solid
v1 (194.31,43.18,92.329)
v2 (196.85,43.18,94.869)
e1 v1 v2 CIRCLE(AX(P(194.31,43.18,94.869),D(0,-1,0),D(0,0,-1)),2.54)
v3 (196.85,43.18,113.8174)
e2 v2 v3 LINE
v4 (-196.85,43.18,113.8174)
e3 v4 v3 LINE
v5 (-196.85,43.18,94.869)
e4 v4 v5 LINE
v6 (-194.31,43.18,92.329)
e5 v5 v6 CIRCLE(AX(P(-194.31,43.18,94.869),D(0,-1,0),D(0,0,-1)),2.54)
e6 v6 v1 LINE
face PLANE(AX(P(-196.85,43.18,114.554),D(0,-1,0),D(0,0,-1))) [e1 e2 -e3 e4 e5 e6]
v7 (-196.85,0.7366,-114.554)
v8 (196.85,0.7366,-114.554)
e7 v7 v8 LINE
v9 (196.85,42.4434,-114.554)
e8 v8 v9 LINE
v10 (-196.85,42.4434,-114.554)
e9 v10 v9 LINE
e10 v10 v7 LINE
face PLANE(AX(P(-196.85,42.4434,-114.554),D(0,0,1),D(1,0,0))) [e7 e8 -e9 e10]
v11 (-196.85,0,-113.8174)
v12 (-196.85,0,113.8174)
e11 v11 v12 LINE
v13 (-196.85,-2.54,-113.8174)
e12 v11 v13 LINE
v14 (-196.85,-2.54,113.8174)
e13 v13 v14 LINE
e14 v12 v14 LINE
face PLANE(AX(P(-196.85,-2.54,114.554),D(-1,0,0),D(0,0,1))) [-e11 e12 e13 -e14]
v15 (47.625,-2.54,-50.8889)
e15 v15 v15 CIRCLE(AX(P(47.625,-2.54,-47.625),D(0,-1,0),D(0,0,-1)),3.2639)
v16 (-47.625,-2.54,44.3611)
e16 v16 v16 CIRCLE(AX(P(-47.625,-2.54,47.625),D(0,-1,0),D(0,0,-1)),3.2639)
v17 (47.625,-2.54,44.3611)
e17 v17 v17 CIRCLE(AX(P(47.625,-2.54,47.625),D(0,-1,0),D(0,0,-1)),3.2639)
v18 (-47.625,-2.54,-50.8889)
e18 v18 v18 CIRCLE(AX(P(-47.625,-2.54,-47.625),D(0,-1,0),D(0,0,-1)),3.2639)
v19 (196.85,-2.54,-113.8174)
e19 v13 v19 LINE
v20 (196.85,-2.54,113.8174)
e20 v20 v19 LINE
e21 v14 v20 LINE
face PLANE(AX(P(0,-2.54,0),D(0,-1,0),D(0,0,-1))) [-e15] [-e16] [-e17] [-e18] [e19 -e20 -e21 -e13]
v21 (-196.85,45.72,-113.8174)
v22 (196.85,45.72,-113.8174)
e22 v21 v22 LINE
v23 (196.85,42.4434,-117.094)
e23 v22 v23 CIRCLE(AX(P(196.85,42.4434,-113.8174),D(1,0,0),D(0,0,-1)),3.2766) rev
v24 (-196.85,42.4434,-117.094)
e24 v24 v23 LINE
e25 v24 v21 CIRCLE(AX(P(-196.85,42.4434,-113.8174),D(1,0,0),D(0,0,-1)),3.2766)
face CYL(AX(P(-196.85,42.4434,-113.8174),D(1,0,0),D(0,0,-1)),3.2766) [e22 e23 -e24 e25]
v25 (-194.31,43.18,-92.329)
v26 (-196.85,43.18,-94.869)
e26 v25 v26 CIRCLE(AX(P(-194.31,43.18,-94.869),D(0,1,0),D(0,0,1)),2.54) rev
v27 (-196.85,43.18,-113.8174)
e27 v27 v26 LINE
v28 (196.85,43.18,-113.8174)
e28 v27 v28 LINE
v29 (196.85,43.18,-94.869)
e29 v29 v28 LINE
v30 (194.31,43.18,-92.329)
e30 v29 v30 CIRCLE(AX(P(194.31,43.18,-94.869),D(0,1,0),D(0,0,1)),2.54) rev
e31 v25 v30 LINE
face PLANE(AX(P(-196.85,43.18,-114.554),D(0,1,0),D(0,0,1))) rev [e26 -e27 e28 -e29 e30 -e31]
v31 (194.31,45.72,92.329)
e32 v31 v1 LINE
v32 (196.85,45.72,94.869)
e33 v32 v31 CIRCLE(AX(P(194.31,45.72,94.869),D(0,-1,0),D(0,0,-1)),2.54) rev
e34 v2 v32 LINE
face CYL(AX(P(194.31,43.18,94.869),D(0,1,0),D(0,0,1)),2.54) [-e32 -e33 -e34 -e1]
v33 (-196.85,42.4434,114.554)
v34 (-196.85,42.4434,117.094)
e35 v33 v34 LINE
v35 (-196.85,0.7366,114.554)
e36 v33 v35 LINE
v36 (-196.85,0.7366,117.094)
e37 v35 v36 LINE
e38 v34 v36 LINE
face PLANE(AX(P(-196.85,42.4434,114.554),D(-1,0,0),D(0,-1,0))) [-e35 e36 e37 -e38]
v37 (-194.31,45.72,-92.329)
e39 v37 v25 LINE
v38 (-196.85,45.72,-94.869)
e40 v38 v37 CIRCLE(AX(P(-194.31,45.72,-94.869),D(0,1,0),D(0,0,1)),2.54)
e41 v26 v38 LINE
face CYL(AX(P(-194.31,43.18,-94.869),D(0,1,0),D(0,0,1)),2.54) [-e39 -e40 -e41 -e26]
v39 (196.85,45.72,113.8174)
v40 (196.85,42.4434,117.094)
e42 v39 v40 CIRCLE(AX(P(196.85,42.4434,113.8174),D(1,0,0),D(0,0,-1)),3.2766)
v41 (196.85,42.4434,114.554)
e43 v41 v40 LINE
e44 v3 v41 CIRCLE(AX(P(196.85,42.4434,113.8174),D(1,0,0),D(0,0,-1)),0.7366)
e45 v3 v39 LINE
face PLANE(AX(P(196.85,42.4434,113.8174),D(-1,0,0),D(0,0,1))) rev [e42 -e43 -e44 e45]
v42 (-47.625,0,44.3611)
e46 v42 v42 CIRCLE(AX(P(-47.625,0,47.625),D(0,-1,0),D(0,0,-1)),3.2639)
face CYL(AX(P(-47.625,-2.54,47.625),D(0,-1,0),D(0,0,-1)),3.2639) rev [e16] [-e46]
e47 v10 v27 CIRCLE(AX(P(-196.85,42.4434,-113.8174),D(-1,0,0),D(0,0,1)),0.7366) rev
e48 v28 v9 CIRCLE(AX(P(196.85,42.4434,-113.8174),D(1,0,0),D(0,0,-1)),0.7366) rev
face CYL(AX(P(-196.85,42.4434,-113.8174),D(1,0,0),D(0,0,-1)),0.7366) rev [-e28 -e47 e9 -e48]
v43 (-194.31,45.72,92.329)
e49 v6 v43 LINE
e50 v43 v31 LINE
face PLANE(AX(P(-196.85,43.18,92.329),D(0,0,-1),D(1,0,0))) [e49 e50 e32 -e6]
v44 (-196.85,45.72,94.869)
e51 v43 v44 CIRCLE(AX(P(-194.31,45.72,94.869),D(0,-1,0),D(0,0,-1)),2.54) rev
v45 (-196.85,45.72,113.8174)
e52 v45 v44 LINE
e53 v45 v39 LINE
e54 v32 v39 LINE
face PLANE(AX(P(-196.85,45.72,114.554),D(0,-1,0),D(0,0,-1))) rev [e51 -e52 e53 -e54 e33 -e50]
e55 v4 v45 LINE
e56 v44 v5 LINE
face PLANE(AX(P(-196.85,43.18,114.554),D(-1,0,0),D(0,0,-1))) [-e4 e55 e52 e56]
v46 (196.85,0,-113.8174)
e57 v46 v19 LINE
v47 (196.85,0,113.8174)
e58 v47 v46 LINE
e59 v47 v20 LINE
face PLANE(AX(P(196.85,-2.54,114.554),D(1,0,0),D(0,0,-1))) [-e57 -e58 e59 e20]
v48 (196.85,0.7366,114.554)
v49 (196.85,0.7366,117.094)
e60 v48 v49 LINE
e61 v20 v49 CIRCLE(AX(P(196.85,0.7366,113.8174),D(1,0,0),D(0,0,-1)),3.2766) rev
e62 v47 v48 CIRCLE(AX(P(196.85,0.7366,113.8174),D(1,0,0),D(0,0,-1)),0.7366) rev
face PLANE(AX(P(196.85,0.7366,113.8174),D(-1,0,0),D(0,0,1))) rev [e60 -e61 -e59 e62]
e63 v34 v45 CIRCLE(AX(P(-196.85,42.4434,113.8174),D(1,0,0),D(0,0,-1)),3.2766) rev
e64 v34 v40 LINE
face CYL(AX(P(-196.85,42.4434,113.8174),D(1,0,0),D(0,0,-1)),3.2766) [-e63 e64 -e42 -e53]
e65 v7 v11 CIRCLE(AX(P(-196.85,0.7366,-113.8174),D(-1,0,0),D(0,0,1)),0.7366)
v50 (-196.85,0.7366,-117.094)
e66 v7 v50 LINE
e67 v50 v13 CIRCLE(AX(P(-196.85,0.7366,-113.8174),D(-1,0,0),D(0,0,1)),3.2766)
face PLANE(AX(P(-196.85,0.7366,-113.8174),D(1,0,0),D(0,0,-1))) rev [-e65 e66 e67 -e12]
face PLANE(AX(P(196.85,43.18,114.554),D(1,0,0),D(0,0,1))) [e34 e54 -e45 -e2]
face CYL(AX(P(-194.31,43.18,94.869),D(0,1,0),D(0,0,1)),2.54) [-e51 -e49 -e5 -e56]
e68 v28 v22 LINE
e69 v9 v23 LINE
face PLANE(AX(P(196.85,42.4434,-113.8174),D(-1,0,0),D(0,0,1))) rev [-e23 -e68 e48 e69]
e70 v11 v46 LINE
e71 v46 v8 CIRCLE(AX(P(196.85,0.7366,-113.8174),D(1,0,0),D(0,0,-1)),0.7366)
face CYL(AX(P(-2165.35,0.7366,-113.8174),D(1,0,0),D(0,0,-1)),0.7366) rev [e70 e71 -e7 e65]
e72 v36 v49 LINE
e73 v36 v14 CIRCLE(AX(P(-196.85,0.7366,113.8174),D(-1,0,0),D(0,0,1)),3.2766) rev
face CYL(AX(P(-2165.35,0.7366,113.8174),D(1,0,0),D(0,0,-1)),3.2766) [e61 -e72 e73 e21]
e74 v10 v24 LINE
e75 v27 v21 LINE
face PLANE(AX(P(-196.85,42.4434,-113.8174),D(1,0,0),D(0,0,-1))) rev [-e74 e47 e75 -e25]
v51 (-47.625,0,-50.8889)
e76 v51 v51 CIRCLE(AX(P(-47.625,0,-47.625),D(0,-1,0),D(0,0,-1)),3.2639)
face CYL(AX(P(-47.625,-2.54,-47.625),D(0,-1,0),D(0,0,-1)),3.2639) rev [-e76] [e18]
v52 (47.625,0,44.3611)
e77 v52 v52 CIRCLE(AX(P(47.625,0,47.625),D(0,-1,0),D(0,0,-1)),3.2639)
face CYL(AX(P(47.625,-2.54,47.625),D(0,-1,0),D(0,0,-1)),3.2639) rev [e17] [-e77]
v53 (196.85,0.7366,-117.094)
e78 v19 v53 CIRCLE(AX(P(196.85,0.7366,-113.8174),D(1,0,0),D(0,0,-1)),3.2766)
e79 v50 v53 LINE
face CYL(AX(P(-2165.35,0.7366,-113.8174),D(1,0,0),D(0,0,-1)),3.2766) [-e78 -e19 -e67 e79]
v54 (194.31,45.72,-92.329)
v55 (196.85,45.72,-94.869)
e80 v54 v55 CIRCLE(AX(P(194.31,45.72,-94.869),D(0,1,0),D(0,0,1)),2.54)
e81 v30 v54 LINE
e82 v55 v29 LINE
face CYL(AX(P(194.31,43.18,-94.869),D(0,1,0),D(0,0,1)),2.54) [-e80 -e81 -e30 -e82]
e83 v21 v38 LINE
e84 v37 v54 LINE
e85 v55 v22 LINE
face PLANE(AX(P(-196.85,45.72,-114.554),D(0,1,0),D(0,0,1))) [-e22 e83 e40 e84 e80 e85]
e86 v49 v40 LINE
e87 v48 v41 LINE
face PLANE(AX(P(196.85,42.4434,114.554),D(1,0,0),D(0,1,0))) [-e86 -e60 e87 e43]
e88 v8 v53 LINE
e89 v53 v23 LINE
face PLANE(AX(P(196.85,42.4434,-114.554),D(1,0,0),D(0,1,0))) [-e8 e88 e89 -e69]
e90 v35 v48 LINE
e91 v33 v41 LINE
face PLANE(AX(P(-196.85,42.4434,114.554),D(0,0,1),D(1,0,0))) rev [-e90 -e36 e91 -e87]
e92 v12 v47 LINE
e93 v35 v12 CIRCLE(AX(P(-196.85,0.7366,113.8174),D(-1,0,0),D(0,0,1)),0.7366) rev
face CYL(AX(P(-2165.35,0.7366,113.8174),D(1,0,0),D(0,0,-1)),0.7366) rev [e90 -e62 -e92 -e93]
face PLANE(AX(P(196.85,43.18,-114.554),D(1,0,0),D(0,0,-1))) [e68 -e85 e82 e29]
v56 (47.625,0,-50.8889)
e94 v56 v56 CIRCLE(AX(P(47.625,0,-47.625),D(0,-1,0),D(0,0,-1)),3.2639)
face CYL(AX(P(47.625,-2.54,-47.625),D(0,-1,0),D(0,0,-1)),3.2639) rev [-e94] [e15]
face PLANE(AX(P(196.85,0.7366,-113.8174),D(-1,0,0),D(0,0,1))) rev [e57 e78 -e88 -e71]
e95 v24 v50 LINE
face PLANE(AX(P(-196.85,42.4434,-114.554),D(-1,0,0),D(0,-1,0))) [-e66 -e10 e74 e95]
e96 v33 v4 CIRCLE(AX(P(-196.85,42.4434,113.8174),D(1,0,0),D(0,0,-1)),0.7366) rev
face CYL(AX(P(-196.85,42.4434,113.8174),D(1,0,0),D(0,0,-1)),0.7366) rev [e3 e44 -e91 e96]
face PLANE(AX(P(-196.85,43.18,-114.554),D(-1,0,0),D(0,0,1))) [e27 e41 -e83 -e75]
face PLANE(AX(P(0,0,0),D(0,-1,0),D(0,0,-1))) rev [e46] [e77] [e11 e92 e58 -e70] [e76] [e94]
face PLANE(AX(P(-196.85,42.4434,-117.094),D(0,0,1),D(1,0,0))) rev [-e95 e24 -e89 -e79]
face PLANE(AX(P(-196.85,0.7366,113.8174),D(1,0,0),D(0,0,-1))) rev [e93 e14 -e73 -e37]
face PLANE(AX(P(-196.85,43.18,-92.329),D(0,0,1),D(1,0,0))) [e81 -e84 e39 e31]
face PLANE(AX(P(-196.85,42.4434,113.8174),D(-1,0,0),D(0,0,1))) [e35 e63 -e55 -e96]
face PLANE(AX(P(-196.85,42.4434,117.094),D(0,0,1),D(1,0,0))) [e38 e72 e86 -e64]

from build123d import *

# Parameters (mm, degrees)
SKETCH1_W               = 393.7
SKETCH1_H               = 229.108
BASE_FLANGE1_DEPTH      = 2.54
MITER_START             = -196.85
MITER_FLANGE1_DEPTH     = 393.7
MITER_FLANGE1_2_DEPTH   = 393.7
FILLET1_R               = 2.54
F_1_4_CLEARANCE_HOLE1_D = 6.5278


# Read off the part's stored shape, not the designer's step: Miter Flange1
# Sheet-metal steps are written as plain solids
with BuildPart() as part:
    # Sketch1 → Base-Flange1 (new body)
    with BuildSketch(Plane(origin=(0, 0, 0), x_dir=(1, 0, 0), z_dir=(0, 1, 0))):
        Rectangle(SKETCH1_W, SKETCH1_H)
    extrude(amount=-BASE_FLANGE1_DEPTH)

    # Miter Flange1 outline → Miter Flange1 (cut)
    with BuildSketch(Plane.YZ.offset(MITER_START)):
        with BuildLine():
            Line((-2.54, -114.554), (-2.456130493, -114.554))
            ThreePointArc((-2.456130493, -114.554), (-2.518965104, -114.188079664), (-2.54, -113.8174))
            Line((-2.54, -113.8174), (-2.54, -114.554))
        make_face()
    miter_flange1 = extrude(amount=MITER_FLANGE1_DEPTH, mode=Mode.SUBTRACT)

    # Miter Flange1 2 outline → Miter Flange1 2 (add)
    with BuildSketch(Plane.YZ.offset(MITER_START)):
        with BuildLine():
            Line((45.72, -113.8174), (45.72, -92.329))
            Line((45.72, -92.329), (43.18, -92.329))
            Line((43.18, -92.329), (43.18, -113.8174))
            ThreePointArc((43.18, -113.8174), (42.964254855, -114.338254855), (42.4434, -114.554))
            Line((42.4434, -114.554), (0.7366, -114.554))
            ThreePointArc((0.7366, -114.554), (0.215745145, -114.338254855), (0, -113.8174))
            Line((0, -113.8174), (0, -114.554))
            Line((0, -114.554), (-2.456130493, -114.554))
            ThreePointArc((-2.456130493, -114.554), (-1.303322057, -116.381542266), (0.7366, -117.094))
            Line((0.7366, -117.094), (42.4434, -117.094))
            ThreePointArc((42.4434, -117.094), (44.760306079, -116.134306079), (45.72, -113.8174))
        make_face()
    miter_flange1_2 = extrude(amount=MITER_FLANGE1_2_DEPTH)

    # Mirror1: Miter Flange1, Miter Flange1 2 across plane
    add(miter_flange1.mirror(Plane.XY), mode=Mode.SUBTRACT)
    add(miter_flange1_2.mirror(Plane.XY))

    # Fillet1
    fillet1_edges = [part.edges().sort_by_distance(p)[0] for p in [
        (-196.85, 44.45, -92.329),
        (196.85, 44.45, -92.329),
        (-196.85, 44.45, 92.329),
        (196.85, 44.45, 92.329),
    ]]
    fillet(fillet1_edges, radius=FILLET1_R)

    # 1/4 Clearance Hole1 (through all)
    with Locations(Plane(origin=(0, -2.54, 0), x_dir=(-1, 0, 0), z_dir=(0, -1, 0))):
        with Locations((-47.625, -47.625), (-47.625, 47.625), (47.625, 47.625), (47.625, -47.625)):
            Hole(F_1_4_CLEARANCE_HOLE1_D / 2)


solid = part.part
